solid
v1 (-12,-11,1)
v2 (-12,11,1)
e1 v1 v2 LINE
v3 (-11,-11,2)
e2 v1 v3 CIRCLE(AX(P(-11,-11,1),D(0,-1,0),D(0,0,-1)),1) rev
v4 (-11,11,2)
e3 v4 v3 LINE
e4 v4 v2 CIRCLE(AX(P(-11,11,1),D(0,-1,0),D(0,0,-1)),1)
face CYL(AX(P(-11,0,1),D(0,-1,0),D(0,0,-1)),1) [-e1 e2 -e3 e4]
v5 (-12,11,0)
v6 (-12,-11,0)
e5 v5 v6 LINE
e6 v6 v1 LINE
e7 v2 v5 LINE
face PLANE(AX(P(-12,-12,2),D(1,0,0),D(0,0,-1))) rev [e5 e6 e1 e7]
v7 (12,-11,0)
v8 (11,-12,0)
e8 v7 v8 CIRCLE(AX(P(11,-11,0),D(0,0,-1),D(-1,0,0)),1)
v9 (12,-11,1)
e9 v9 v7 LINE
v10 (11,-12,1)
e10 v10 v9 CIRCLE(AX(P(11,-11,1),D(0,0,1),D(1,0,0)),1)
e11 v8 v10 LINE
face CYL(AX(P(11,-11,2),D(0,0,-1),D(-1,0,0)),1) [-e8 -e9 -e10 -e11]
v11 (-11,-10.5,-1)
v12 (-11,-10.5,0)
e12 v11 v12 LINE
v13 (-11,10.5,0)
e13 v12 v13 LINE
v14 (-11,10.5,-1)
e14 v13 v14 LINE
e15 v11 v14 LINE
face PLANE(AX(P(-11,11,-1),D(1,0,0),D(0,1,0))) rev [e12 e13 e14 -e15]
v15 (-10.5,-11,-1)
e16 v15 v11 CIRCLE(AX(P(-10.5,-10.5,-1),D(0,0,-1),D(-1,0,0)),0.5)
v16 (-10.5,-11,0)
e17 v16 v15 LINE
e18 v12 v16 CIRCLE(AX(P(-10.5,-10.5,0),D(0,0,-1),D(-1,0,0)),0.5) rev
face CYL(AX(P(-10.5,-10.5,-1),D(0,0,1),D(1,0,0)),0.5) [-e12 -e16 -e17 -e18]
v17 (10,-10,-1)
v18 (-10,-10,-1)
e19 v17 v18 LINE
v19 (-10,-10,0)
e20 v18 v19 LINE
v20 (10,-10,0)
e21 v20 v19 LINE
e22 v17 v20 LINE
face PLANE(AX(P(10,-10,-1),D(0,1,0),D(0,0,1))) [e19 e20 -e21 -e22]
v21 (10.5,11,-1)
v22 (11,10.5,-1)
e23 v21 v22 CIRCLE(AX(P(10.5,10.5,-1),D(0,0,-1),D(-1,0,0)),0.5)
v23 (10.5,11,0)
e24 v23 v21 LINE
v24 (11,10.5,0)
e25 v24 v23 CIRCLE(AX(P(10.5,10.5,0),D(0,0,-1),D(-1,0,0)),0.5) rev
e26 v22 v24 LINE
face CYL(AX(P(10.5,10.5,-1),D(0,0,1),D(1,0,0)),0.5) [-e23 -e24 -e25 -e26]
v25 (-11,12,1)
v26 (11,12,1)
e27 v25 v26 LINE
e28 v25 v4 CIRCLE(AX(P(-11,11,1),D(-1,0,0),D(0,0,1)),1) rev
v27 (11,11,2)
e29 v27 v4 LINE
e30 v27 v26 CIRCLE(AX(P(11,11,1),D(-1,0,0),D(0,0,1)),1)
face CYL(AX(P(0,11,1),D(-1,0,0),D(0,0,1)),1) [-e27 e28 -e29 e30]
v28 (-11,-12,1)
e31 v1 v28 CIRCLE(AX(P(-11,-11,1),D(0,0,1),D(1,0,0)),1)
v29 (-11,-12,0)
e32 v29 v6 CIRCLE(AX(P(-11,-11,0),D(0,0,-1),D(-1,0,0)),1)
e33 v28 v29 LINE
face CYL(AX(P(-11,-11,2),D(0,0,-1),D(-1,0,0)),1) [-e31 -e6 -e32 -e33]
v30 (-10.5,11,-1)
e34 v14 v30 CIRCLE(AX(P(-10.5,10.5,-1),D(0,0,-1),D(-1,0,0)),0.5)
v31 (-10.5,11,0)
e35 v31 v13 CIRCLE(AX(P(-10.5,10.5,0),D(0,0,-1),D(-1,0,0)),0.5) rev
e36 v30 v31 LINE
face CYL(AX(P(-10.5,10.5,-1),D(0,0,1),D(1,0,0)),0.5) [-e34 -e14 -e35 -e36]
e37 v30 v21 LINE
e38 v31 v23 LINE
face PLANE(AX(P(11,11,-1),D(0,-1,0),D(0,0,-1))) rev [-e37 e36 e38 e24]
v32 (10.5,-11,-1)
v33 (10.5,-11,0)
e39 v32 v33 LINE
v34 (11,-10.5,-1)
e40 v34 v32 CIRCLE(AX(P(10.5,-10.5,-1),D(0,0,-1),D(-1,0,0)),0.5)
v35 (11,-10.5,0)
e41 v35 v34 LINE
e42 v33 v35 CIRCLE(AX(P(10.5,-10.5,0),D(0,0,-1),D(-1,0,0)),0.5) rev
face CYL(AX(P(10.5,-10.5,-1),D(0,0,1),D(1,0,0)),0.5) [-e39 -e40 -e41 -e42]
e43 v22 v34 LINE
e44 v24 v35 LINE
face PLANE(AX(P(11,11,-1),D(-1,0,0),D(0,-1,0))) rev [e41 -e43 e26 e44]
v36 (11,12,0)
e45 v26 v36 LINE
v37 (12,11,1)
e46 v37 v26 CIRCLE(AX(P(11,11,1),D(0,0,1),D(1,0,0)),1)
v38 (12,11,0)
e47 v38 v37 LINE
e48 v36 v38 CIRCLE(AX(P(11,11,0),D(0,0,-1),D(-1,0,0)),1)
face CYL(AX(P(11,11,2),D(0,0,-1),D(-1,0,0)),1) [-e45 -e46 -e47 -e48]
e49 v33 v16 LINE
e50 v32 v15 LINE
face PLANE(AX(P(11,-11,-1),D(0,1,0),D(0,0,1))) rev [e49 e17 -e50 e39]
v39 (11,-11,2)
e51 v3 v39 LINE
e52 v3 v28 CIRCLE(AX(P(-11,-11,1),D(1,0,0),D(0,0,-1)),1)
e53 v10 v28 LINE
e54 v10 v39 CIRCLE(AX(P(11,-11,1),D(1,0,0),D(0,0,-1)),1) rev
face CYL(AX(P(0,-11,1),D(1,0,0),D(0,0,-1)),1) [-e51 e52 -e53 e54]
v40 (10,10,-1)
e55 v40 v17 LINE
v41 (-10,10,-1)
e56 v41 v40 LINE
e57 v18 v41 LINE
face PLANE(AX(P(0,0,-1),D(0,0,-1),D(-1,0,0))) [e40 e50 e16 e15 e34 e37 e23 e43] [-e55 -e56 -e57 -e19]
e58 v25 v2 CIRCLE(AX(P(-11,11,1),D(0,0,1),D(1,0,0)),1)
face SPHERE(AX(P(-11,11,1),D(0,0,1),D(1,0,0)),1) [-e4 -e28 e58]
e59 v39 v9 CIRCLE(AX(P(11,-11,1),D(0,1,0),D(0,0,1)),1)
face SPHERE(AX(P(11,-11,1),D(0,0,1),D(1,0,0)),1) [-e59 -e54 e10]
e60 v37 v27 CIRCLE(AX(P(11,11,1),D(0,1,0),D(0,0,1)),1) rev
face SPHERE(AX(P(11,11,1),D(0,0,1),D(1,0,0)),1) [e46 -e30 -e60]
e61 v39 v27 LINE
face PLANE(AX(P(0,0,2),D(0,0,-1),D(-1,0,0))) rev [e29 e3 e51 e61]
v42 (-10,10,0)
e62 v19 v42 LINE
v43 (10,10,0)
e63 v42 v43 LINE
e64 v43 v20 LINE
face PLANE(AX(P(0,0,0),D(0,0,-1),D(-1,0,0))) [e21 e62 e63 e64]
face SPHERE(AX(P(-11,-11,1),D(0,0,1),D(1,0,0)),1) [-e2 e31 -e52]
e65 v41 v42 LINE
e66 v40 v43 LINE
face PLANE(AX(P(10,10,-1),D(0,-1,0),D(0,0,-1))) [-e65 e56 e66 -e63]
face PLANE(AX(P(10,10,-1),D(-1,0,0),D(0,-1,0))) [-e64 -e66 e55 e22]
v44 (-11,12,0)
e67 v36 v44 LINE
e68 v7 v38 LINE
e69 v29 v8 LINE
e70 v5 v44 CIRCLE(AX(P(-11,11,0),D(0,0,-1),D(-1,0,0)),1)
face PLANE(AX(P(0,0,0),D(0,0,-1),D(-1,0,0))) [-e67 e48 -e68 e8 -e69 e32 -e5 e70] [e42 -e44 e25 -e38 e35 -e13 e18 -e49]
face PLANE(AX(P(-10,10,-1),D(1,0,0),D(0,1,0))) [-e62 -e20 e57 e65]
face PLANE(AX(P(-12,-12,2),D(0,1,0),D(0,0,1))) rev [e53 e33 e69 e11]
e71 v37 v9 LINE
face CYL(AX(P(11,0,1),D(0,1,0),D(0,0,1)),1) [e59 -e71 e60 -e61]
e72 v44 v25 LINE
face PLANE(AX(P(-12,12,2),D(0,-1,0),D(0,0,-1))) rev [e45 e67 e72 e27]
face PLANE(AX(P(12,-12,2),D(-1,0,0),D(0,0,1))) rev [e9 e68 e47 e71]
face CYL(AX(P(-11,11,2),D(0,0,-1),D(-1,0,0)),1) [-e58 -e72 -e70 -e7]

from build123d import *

# Parameters (mm, degrees)
SKETCH1_W           = 24
SKETCH1_H           = 24
BOSS_EXTRUDE1_DEPTH = 2
SKETCH2_W           = 22
SKETCH2_H           = 22
SKETCH2_W_2         = 20
SKETCH2_H_2         = 20
BOSS_EXTRUDE2_DEPTH = 1
FILLET1_R           = 1
FILLET2_R           = 1
FILLET3_R           = 0.5


with BuildPart() as part:
    # Sketch1 → Boss-Extrude1 (new body)
    with BuildSketch(Plane.XY):
        Rectangle(SKETCH1_W, SKETCH1_H)
    extrude(amount=BOSS_EXTRUDE1_DEPTH)

    # Sketch2 → Boss-Extrude2 (add)
    with BuildSketch(Plane(origin=(0, 0, 0), x_dir=(-1, 0, 0), z_dir=(0, 0, -1))):
        Rectangle(SKETCH2_W, SKETCH2_H)
        Rectangle(SKETCH2_W_2, SKETCH2_H_2, mode=Mode.SUBTRACT)
    extrude(amount=BOSS_EXTRUDE2_DEPTH)

    # Fillet1
    fillet1_edges = [part.edges().sort_by_distance(p)[0] for p in [
        (-12, 0, 2),
        (0, -12, 2),
        (12, 0, 2),
        (0, 12, 2),
    ]]
    fillet(fillet1_edges, radius=FILLET1_R)

    # Fillet2
    # the kernel refuses this fillet: 1 mm, written as the material it takes off along each edge
    with BuildSketch(Plane(origin=(-11, -11, 1), x_dir=(-1, 0, 0), z_dir=(0, -1, 0))) as fillet2_piece_1_section:
        Polygon((0, 0), (FILLET2_R, 0), (FILLET2_R, -FILLET2_R), (0, -FILLET2_R), align=None)
    fillet2_piece_1 = extrude(amount=FILLET2_R, mode=Mode.PRIVATE)
    fillet2_piece_1 = fillet2_piece_1 - Plane(origin=(-11, -11, 1), x_dir=(0.7071067811865475, 0, -0.7071067811865475), z_dir=(0, -1, 0)) * Sphere(FILLET2_R, mode=Mode.PRIVATE)
    add(fillet2_piece_1, mode=Mode.SUBTRACT)
    with BuildSketch(Plane(origin=(-11, 11, 1), x_dir=(0, 1, 0), z_dir=(-1, 0, 0))) as fillet2_piece_2_section:
        Polygon((0, 0), (FILLET2_R, 0), (FILLET2_R, -FILLET2_R), (0, -FILLET2_R), align=None)
    fillet2_piece_2 = extrude(amount=FILLET2_R, mode=Mode.PRIVATE)
    fillet2_piece_2 = fillet2_piece_2 - Plane(origin=(-11, 11, 1), x_dir=(0, -0.7071067811865475, -0.7071067811865475), z_dir=(-1, 0, 0)) * Sphere(FILLET2_R, mode=Mode.PRIVATE)
    add(fillet2_piece_2, mode=Mode.SUBTRACT)
    with BuildSketch(Plane(origin=(11, -11, 1), x_dir=(1, 0, 0), z_dir=(0, -1, 0))) as fillet2_piece_3_section:
        Polygon((0, 0), (FILLET2_R, 0), (FILLET2_R, FILLET2_R), (0, FILLET2_R), align=None)
    fillet2_piece_3 = extrude(amount=FILLET2_R, mode=Mode.PRIVATE)
    fillet2_piece_3 = fillet2_piece_3 - Plane(origin=(11, -11, 1), x_dir=(-0.7071067811865475, 0, -0.7071067811865475), z_dir=(0, -1, 0)) * Sphere(FILLET2_R, mode=Mode.PRIVATE)
    add(fillet2_piece_3, mode=Mode.SUBTRACT)
    with BuildSketch(Plane(origin=(11, 11, 1), x_dir=(0, 1, 0), z_dir=(1, 0, 0))) as fillet2_piece_4_section:
        Polygon((0, 0), (FILLET2_R, 0), (FILLET2_R, FILLET2_R), (0, FILLET2_R), align=None)
    fillet2_piece_4 = extrude(amount=FILLET2_R, mode=Mode.PRIVATE)
    fillet2_piece_4 = fillet2_piece_4 - Plane(origin=(11, 11, 1), x_dir=(0, -0.7071067811865475, -0.7071067811865475), z_dir=(1, 0, 0)) * Sphere(FILLET2_R, mode=Mode.PRIVATE)
    add(fillet2_piece_4, mode=Mode.SUBTRACT)
    with BuildSketch(Plane(origin=(12, 12, -2.5), x_dir=(0, -1, 0), z_dir=(0, 0, 1)), Plane(origin=(12, -12, -2.5), x_dir=(-1, 0, 0), z_dir=(0, 0, 1))) as fillet2_piece_5:
        with BuildLine():
            CenterArc((FILLET2_R, -FILLET2_R), FILLET2_R, 90, 90)
            Line((0, -FILLET2_R), (0, 0))
            Line((0, 0), (FILLET2_R, 0))
        make_face()
    extrude(amount=3.5, mode=Mode.SUBTRACT)
    with BuildSketch(Plane(origin=(-12, -12, -2.5), x_dir=(1, 0, 0), z_dir=(0, 0, 1)), Plane(origin=(-12, 12, -2.5), x_dir=(0, -1, 0), z_dir=(0, 0, 1))) as fillet2_piece_6:
        with BuildLine():
            CenterArc((FILLET2_R, FILLET2_R), FILLET2_R, 180, 90)
            Line((0, FILLET2_R), (0, 0))
            Line((0, 0), (FILLET2_R, 0))
        make_face()
    extrude(amount=3.5, mode=Mode.SUBTRACT)

    # Fillet3
    fillet3_edges = [part.edges().sort_by_distance(p)[0] for p in [
        (-11, -11, -0.5),
        (-11, 11, -0.5),
        (11, 11, -0.5),
        (11, -11, -0.5),
    ]]
    fillet(fillet3_edges, radius=FILLET3_R)


solid = part.part
